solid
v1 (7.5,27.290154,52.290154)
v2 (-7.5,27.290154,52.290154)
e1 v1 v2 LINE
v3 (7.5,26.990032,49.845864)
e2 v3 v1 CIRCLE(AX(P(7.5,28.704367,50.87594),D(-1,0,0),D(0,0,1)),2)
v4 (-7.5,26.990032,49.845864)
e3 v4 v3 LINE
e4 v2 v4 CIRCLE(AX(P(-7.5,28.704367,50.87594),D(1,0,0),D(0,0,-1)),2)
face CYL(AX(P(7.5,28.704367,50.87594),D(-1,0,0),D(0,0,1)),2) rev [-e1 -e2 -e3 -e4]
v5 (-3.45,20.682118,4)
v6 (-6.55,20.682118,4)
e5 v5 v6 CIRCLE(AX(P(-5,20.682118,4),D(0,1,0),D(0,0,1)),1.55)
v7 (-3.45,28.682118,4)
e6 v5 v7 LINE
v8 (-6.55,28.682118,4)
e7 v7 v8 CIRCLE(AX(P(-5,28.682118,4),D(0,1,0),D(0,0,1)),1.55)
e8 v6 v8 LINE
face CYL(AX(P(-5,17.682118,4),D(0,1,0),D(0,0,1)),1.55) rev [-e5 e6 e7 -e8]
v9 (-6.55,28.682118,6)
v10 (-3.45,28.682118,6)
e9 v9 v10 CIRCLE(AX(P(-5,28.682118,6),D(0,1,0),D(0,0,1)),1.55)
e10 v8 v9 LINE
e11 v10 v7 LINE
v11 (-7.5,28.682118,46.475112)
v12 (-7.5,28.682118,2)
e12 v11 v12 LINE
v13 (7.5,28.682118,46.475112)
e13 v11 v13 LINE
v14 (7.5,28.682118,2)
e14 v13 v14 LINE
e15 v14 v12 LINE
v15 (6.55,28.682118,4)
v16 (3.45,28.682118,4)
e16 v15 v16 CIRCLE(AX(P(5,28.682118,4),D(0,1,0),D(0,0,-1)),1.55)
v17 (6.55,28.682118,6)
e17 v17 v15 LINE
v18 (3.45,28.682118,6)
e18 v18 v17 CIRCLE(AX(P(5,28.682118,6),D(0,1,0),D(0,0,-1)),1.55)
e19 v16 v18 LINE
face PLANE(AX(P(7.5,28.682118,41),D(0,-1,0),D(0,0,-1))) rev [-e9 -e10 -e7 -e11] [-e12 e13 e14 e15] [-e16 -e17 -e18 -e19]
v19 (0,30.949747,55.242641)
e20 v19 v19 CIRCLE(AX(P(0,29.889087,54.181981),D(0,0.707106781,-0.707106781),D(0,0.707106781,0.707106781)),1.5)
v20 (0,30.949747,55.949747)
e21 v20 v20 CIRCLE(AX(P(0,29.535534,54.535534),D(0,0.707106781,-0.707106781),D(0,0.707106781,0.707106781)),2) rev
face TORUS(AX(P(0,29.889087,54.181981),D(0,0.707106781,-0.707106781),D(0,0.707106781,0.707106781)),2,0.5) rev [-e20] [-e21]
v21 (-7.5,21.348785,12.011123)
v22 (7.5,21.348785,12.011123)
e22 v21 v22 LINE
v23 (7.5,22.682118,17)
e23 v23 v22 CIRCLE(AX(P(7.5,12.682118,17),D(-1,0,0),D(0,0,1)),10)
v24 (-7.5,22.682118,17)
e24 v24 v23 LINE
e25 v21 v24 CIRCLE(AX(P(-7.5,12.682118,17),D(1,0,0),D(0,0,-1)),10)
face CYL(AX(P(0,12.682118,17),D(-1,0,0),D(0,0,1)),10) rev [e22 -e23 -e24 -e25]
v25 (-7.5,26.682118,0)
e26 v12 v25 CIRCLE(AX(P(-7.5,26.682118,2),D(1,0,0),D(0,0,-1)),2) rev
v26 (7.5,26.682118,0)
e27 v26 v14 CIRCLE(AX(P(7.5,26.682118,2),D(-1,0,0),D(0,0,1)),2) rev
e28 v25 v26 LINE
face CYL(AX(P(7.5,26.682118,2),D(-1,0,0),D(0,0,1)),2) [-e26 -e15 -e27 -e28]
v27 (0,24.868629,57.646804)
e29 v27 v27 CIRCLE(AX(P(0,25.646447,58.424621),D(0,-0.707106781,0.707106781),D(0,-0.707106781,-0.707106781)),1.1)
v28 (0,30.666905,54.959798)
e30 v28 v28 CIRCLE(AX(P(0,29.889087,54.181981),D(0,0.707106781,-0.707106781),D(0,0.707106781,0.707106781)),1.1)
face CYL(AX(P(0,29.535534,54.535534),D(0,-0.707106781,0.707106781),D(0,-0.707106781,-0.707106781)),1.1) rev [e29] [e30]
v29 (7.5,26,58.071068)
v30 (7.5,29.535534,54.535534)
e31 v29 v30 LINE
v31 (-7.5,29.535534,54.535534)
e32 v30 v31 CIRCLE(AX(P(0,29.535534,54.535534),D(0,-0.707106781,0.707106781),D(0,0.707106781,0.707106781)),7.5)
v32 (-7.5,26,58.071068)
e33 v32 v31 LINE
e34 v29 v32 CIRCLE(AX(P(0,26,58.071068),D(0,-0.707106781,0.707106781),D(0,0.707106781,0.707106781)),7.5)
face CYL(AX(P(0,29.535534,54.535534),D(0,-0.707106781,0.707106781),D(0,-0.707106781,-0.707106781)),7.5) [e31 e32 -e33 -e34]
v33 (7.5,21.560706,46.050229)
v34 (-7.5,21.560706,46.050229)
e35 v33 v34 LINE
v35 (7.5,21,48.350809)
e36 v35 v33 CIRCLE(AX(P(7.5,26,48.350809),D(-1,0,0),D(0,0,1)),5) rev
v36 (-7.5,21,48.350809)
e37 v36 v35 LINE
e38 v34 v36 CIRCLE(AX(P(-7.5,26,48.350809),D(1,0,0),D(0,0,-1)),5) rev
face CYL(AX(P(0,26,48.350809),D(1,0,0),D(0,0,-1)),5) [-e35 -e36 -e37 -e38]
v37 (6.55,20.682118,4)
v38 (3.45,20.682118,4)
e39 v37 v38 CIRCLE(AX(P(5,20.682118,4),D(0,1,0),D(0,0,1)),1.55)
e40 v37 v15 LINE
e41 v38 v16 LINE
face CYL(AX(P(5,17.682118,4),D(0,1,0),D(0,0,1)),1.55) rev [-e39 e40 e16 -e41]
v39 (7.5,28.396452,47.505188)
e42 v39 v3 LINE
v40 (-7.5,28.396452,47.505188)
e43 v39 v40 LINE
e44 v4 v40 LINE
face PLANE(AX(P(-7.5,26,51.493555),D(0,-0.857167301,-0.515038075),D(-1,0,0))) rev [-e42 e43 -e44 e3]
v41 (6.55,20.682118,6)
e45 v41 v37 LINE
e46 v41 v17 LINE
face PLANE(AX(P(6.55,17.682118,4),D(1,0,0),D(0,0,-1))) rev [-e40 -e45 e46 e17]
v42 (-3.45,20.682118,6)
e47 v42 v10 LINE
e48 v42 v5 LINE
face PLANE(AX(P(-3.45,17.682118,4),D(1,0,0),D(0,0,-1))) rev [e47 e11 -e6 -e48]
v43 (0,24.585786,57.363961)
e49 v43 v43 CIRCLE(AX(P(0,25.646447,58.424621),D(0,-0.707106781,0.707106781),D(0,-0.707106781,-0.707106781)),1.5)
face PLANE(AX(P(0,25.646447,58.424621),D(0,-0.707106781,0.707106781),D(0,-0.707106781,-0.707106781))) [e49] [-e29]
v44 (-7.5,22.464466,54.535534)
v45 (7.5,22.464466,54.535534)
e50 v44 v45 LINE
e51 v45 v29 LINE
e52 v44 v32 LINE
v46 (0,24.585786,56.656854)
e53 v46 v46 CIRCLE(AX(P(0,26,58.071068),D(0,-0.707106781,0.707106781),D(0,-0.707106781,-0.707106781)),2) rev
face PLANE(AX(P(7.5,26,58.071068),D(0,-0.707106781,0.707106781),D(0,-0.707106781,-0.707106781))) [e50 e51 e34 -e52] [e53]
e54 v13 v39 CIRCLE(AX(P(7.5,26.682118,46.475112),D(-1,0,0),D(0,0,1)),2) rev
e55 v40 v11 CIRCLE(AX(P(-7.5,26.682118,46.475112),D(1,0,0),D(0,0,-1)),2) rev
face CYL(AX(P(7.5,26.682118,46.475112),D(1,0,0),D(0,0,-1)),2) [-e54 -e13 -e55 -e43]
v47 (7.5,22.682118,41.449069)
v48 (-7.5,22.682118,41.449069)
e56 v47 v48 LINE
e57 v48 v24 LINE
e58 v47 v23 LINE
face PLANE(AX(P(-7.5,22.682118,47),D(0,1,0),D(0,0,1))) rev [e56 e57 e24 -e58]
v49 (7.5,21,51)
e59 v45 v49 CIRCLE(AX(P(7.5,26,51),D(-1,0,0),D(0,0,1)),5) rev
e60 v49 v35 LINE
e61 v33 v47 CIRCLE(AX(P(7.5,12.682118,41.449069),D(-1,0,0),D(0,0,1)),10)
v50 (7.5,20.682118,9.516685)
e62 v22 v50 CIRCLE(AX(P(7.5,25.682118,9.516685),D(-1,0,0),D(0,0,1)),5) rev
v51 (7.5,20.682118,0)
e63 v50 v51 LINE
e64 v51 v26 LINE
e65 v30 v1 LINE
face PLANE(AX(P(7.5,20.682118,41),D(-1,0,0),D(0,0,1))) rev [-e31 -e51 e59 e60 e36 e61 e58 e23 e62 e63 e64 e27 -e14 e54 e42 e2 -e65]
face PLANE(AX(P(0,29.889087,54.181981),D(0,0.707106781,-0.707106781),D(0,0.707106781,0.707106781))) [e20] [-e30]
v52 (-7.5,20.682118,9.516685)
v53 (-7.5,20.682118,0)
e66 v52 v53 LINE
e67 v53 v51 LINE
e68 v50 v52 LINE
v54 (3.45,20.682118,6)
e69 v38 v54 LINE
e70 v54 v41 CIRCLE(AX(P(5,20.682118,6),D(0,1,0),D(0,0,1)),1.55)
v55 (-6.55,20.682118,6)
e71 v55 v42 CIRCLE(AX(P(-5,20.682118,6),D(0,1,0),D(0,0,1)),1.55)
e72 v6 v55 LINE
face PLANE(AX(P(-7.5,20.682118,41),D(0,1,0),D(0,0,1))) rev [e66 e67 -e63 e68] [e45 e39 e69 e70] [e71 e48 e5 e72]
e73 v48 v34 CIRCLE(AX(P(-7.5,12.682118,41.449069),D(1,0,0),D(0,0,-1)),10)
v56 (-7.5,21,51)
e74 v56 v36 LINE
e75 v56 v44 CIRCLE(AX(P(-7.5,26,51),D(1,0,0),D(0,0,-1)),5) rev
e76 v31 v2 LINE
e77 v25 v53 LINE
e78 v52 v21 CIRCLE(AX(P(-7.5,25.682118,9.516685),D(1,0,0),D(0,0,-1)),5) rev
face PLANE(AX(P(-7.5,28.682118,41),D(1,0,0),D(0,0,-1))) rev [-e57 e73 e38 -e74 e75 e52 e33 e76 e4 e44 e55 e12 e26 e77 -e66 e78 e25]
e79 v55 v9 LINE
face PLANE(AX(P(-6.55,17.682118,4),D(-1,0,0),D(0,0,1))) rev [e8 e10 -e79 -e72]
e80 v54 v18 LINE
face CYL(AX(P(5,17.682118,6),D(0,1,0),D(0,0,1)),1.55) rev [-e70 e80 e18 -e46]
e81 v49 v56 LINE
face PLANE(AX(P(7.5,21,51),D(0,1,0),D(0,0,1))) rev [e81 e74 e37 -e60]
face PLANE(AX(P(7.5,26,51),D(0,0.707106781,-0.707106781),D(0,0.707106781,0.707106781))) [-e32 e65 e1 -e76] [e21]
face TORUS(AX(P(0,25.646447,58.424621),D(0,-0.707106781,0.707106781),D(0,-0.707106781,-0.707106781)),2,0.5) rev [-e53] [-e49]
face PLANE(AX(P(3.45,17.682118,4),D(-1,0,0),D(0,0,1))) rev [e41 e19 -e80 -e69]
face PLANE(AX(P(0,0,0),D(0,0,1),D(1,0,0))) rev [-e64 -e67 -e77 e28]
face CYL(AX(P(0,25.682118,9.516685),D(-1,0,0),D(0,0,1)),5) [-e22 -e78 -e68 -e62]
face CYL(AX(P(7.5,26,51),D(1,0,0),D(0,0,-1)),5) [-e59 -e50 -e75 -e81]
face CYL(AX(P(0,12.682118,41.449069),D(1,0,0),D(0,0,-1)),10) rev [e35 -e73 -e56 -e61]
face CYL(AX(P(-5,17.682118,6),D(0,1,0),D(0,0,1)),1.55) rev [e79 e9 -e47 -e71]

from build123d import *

# Parameters (mm, degrees)
SKETCH_10_W         = 15
SKETCH_10_H         = 8
EXTRUDE_7_DEPTH     = 41
CUT_EXTRUDE_4_DEPTH = 11
SKETCH_12_W         = 15
SKETCH_12_H         = 6
EXTRUDE_8_DEPTH     = 6
SKETCH_14_W         = 15
SKETCH_14_H         = 5
EXTRUDE_9_DEPTH     = 4
EXTRUDE_10_DEPTH    = 15
EXTRUDE_11_DEPTH    = 5
SKETCH_19_R         = 1.1
CUT_EXTRUDE_5_DEPTH = 5
EXTRUDE_START       = 0.5
SKETCH_20_R         = 1.5
SKETCH_20_R_2       = 1.1
EXTRUDE_12_DEPTH    = 0.5
SKETCH_21_R         = 1.5
SKETCH_21_R_2       = 1.1
EXTRUDE_13_DEPTH    = 0.5
FILLET_4_R          = 0.5
CHAMFER_1_SIZE      = 4.493554602
CHAMFER_1_SIZE_2    = 2.7
FILLET_7_R          = 2
SKETCH_23_W         = 15
SKETCH_23_H         = 2
CUT_EXTRUDE_6_DEPTH = 30
FILLET_8_R          = 10
FILLET_9_R          = 5
FILLET_10_R         = 2


# Some blends are built 0.0001 mm under size
with BuildPart() as part:
    # 草图10 → 凸台-拉伸7 (new body)
    with BuildSketch(Plane.XY):
        with Locations((0, 24.68211788)):
            Rectangle(SKETCH_10_W, SKETCH_10_H)
    extrude(amount=EXTRUDE_7_DEPTH)

    # 草图11 → 切除-拉伸4 (cut)
    with BuildSketch(Plane(origin=(0, 28.68211788, 0), x_dir=(1, 0, 0), z_dir=(0, 1, 0))):
        with BuildLine():
            Line((-3.45, -4), (-3.45, -6))
            ThreePointArc((-3.45, -6), (-5, -7.55), (-6.55, -6))
            Line((-6.55, -6), (-6.55, -4))
            ThreePointArc((-6.55, -4), (-5, -2.45), (-3.45, -4))
        make_face()
        with BuildLine():
            Line((3.45, -4), (3.45, -6))
            ThreePointArc((3.45, -6), (5, -7.55), (6.55, -6))
            Line((6.55, -6), (6.55, -4))
            ThreePointArc((6.55, -4), (5, -2.45), (3.45, -4))
        make_face()
    extrude(amount=-CUT_EXTRUDE_4_DEPTH, mode=Mode.SUBTRACT)

    # 草图12 → 凸台-拉伸8 (add)
    with BuildSketch(Plane.XY.offset(41)):
        with Locations((0, 25.68211788)):
            Rectangle(SKETCH_12_W, SKETCH_12_H)
    extrude(amount=EXTRUDE_8_DEPTH)

    # 草图14 → 凸台-拉伸9 (add)
    with BuildSketch(Plane.XY.offset(47)):
        with Locations((0, 23.5)):
            Rectangle(SKETCH_14_W, SKETCH_14_H)
    extrude(amount=EXTRUDE_9_DEPTH)

    # 草图17 → 凸台-拉伸10 (add)
    with BuildSketch(Plane.ZY.offset(7.5)):
        Polygon((51, 26), (54.535533906, 29.535533906), (58.071067812, 26), (53.071067812, 21), (51, 21), align=None)
    extrude(amount=-EXTRUDE_10_DEPTH)

    # 草图18 → 凸台-拉伸11 (add)
    with BuildSketch(Plane(origin=(0, -16.035533906, 16.035533906), x_dir=(1, 0, 0), z_dir=(0, -0.7071067811865507, 0.7071067811865445))):
        with BuildLine():
            Line((7.5, 59.447222151), (-7.5, 59.447222151))
            ThreePointArc((-7.5, 59.447222151), (0, 66.947222151), (7.5, 59.447222151))
        make_face()
    extrude(amount=-EXTRUDE_11_DEPTH)

    # 草图19 → 切除-拉伸5 (cut)
    with BuildSketch(Plane(origin=(0, -16.035533906, 16.035533906), x_dir=(1, 0, 0), z_dir=(0, -0.7071067811865507, 0.7071067811865445))):
        with Locations(Location((0, 59.447222151, 0), (0, 0, 270))):
            Circle(SKETCH_19_R)
    extrude(amount=-CUT_EXTRUDE_5_DEPTH, mode=Mode.SUBTRACT)

    # 草图20 → 凸台-拉伸12 (add)
    with BuildSketch(Plane(origin=(0, -16.035533906, 16.035533906), x_dir=(1, 0, 0), z_dir=(0, -0.7071067811865507, 0.7071067811865445)).offset(EXTRUDE_START)):
        with Locations(Location((0, 59.447222151, 0), (0, 0, 270))):
            Circle(SKETCH_20_R)
        with Locations(Location((0, 59.447222151, 0), (0, 0, 270))):
            Circle(SKETCH_20_R_2, mode=Mode.SUBTRACT)
    extrude(amount=-EXTRUDE_12_DEPTH)

    # 草图21 → 凸台-拉伸13 (add)
    with BuildSketch(Plane(origin=(0, -12.5, 12.5), x_dir=(1, 0, 0), z_dir=(0, 0.7071067811865513, -0.7071067811865437))):
        with Locations(Location((0, -59.447222151, 0), (0, 0, 90))):
            Circle(SKETCH_21_R)
        with Locations(Location((0, -59.447222151, 0), (0, 0, 90))):
            Circle(SKETCH_21_R_2, mode=Mode.SUBTRACT)
    extrude(amount=EXTRUDE_13_DEPTH)

    # 圆角4
    fillet_4_edges = [part.edges().sort_by_distance(p)[0] for p in [
        (0, 27.060660172, 59.131727984),
        (0, 30.596194078, 55.596194078),
    ]]
    fillet(fillet_4_edges, radius=FILLET_4_R - 0.0001)  # a hair under: the kernel refuses the full size

    # 倒角1
    # the kernel refuses this chamfer: 4.493554602, 2.7 mm, written as the material it adds along each edge
    with BuildSketch(Plane(origin=(-7.5, 26, 47), x_dir=(0, -0.019914630580833353, 0.9998016840798123), z_dir=(1, 0, 0))) as chamfer_1_piece_1_section:
        Polygon((CHAMFER_1_SIZE * 0.999801684157, -CHAMFER_1_SIZE * 0.0199146305824), (-CHAMFER_1_SIZE_2 * 0.0199146305808, -CHAMFER_1_SIZE_2 * 0.99980168408), (0, 0), align=None)
    chamfer_1_piece_1 = extrude(amount=15, mode=Mode.PRIVATE)
    chamfer_1_piece_1 = split(chamfer_1_piece_1, bisect_by=Plane(origin=(0, 28.68211788, 48.477199106), z_dir=(0, -1, 0)), keep=Keep.TOP, mode=Mode.PRIVATE)
    add(chamfer_1_piece_1)

    # 圆角7
    fillet_7_edges = [part.edges().sort_by_distance(p)[0] for p in [
        (0, 26.18524881, 51.18524881),
        (0, 28.68211788, 47.029760846),
    ]]
    fillet(fillet_7_edges, radius=FILLET_7_R)

    # 草图23 → 切除-拉伸6 (cut)
    with BuildSketch(Plane.XY.offset(41)):
        with Locations((0, 21.68211788)):
            Rectangle(SKETCH_23_W, SKETCH_23_H)
    extrude(amount=-CUT_EXTRUDE_6_DEPTH, mode=Mode.SUBTRACT)

    # 圆角8
    # the kernel refuses this fillet: 10 mm, written as the material it adds along each edge
    with BuildSketch(Plane(origin=(7.5, 22.68211788, 11), x_dir=(0, -1, 0), z_dir=(-1, 0, 0))) as fillet_8_piece_1:
        with BuildLine():
            CenterArc((10, 6), FILLET_8_R, 180, 36.869897646)
            Line((0, 6), (-0.2, 6))
            Line((-0.2, 6), (-0.2, 0))
            Line((-0.2, 0), (0, -0.2))
            ThreePointArc((0, -0.2), (1, -0.2), (1.84, -0.12))
            Line((1.84, -0.12), (2, 0))
        make_face()
    extrude(amount=15)
    with BuildSketch(Plane(origin=(7.5, 22.68211788, 47), x_dir=(0, 0, -1), z_dir=(-1, 0, 0))) as fillet_8_piece_2:
        with BuildLine():
            CenterArc((5.550931186, 10), FILLET_8_R, 236.282871199, 33.717128801)
            Line((0, 1.68211788), (-0.111018624, 1.515760238))
            ThreePointArc((-0.111018624, 1.515760238), (-0.2, 0.84105894), (-0.2, 0))
            Line((-0.2, 0), (0, -0.2))
            Line((0, -0.2), (5.550931186, -0.2))
            Line((5.550931186, -0.2), (5.550931186, 0))
        make_face()
    extrude(amount=15)

    # 圆角9
    fillet_9_edges = [part.edges().sort_by_distance(p)[0] for p in [
        (0, 20.68211788, 11),
        (0, 21, 47),
        (0, 21, 53.071067812),
    ]]
    fillet(fillet_9_edges, radius=FILLET_9_R)

    # 圆角10
    fillet_10_edges = [part.edges().sort_by_distance(p)[0] for p in [
        (0, 28.68211788, 0),
    ]]
    fillet(fillet_10_edges, radius=FILLET_10_R)


solid = part.part
